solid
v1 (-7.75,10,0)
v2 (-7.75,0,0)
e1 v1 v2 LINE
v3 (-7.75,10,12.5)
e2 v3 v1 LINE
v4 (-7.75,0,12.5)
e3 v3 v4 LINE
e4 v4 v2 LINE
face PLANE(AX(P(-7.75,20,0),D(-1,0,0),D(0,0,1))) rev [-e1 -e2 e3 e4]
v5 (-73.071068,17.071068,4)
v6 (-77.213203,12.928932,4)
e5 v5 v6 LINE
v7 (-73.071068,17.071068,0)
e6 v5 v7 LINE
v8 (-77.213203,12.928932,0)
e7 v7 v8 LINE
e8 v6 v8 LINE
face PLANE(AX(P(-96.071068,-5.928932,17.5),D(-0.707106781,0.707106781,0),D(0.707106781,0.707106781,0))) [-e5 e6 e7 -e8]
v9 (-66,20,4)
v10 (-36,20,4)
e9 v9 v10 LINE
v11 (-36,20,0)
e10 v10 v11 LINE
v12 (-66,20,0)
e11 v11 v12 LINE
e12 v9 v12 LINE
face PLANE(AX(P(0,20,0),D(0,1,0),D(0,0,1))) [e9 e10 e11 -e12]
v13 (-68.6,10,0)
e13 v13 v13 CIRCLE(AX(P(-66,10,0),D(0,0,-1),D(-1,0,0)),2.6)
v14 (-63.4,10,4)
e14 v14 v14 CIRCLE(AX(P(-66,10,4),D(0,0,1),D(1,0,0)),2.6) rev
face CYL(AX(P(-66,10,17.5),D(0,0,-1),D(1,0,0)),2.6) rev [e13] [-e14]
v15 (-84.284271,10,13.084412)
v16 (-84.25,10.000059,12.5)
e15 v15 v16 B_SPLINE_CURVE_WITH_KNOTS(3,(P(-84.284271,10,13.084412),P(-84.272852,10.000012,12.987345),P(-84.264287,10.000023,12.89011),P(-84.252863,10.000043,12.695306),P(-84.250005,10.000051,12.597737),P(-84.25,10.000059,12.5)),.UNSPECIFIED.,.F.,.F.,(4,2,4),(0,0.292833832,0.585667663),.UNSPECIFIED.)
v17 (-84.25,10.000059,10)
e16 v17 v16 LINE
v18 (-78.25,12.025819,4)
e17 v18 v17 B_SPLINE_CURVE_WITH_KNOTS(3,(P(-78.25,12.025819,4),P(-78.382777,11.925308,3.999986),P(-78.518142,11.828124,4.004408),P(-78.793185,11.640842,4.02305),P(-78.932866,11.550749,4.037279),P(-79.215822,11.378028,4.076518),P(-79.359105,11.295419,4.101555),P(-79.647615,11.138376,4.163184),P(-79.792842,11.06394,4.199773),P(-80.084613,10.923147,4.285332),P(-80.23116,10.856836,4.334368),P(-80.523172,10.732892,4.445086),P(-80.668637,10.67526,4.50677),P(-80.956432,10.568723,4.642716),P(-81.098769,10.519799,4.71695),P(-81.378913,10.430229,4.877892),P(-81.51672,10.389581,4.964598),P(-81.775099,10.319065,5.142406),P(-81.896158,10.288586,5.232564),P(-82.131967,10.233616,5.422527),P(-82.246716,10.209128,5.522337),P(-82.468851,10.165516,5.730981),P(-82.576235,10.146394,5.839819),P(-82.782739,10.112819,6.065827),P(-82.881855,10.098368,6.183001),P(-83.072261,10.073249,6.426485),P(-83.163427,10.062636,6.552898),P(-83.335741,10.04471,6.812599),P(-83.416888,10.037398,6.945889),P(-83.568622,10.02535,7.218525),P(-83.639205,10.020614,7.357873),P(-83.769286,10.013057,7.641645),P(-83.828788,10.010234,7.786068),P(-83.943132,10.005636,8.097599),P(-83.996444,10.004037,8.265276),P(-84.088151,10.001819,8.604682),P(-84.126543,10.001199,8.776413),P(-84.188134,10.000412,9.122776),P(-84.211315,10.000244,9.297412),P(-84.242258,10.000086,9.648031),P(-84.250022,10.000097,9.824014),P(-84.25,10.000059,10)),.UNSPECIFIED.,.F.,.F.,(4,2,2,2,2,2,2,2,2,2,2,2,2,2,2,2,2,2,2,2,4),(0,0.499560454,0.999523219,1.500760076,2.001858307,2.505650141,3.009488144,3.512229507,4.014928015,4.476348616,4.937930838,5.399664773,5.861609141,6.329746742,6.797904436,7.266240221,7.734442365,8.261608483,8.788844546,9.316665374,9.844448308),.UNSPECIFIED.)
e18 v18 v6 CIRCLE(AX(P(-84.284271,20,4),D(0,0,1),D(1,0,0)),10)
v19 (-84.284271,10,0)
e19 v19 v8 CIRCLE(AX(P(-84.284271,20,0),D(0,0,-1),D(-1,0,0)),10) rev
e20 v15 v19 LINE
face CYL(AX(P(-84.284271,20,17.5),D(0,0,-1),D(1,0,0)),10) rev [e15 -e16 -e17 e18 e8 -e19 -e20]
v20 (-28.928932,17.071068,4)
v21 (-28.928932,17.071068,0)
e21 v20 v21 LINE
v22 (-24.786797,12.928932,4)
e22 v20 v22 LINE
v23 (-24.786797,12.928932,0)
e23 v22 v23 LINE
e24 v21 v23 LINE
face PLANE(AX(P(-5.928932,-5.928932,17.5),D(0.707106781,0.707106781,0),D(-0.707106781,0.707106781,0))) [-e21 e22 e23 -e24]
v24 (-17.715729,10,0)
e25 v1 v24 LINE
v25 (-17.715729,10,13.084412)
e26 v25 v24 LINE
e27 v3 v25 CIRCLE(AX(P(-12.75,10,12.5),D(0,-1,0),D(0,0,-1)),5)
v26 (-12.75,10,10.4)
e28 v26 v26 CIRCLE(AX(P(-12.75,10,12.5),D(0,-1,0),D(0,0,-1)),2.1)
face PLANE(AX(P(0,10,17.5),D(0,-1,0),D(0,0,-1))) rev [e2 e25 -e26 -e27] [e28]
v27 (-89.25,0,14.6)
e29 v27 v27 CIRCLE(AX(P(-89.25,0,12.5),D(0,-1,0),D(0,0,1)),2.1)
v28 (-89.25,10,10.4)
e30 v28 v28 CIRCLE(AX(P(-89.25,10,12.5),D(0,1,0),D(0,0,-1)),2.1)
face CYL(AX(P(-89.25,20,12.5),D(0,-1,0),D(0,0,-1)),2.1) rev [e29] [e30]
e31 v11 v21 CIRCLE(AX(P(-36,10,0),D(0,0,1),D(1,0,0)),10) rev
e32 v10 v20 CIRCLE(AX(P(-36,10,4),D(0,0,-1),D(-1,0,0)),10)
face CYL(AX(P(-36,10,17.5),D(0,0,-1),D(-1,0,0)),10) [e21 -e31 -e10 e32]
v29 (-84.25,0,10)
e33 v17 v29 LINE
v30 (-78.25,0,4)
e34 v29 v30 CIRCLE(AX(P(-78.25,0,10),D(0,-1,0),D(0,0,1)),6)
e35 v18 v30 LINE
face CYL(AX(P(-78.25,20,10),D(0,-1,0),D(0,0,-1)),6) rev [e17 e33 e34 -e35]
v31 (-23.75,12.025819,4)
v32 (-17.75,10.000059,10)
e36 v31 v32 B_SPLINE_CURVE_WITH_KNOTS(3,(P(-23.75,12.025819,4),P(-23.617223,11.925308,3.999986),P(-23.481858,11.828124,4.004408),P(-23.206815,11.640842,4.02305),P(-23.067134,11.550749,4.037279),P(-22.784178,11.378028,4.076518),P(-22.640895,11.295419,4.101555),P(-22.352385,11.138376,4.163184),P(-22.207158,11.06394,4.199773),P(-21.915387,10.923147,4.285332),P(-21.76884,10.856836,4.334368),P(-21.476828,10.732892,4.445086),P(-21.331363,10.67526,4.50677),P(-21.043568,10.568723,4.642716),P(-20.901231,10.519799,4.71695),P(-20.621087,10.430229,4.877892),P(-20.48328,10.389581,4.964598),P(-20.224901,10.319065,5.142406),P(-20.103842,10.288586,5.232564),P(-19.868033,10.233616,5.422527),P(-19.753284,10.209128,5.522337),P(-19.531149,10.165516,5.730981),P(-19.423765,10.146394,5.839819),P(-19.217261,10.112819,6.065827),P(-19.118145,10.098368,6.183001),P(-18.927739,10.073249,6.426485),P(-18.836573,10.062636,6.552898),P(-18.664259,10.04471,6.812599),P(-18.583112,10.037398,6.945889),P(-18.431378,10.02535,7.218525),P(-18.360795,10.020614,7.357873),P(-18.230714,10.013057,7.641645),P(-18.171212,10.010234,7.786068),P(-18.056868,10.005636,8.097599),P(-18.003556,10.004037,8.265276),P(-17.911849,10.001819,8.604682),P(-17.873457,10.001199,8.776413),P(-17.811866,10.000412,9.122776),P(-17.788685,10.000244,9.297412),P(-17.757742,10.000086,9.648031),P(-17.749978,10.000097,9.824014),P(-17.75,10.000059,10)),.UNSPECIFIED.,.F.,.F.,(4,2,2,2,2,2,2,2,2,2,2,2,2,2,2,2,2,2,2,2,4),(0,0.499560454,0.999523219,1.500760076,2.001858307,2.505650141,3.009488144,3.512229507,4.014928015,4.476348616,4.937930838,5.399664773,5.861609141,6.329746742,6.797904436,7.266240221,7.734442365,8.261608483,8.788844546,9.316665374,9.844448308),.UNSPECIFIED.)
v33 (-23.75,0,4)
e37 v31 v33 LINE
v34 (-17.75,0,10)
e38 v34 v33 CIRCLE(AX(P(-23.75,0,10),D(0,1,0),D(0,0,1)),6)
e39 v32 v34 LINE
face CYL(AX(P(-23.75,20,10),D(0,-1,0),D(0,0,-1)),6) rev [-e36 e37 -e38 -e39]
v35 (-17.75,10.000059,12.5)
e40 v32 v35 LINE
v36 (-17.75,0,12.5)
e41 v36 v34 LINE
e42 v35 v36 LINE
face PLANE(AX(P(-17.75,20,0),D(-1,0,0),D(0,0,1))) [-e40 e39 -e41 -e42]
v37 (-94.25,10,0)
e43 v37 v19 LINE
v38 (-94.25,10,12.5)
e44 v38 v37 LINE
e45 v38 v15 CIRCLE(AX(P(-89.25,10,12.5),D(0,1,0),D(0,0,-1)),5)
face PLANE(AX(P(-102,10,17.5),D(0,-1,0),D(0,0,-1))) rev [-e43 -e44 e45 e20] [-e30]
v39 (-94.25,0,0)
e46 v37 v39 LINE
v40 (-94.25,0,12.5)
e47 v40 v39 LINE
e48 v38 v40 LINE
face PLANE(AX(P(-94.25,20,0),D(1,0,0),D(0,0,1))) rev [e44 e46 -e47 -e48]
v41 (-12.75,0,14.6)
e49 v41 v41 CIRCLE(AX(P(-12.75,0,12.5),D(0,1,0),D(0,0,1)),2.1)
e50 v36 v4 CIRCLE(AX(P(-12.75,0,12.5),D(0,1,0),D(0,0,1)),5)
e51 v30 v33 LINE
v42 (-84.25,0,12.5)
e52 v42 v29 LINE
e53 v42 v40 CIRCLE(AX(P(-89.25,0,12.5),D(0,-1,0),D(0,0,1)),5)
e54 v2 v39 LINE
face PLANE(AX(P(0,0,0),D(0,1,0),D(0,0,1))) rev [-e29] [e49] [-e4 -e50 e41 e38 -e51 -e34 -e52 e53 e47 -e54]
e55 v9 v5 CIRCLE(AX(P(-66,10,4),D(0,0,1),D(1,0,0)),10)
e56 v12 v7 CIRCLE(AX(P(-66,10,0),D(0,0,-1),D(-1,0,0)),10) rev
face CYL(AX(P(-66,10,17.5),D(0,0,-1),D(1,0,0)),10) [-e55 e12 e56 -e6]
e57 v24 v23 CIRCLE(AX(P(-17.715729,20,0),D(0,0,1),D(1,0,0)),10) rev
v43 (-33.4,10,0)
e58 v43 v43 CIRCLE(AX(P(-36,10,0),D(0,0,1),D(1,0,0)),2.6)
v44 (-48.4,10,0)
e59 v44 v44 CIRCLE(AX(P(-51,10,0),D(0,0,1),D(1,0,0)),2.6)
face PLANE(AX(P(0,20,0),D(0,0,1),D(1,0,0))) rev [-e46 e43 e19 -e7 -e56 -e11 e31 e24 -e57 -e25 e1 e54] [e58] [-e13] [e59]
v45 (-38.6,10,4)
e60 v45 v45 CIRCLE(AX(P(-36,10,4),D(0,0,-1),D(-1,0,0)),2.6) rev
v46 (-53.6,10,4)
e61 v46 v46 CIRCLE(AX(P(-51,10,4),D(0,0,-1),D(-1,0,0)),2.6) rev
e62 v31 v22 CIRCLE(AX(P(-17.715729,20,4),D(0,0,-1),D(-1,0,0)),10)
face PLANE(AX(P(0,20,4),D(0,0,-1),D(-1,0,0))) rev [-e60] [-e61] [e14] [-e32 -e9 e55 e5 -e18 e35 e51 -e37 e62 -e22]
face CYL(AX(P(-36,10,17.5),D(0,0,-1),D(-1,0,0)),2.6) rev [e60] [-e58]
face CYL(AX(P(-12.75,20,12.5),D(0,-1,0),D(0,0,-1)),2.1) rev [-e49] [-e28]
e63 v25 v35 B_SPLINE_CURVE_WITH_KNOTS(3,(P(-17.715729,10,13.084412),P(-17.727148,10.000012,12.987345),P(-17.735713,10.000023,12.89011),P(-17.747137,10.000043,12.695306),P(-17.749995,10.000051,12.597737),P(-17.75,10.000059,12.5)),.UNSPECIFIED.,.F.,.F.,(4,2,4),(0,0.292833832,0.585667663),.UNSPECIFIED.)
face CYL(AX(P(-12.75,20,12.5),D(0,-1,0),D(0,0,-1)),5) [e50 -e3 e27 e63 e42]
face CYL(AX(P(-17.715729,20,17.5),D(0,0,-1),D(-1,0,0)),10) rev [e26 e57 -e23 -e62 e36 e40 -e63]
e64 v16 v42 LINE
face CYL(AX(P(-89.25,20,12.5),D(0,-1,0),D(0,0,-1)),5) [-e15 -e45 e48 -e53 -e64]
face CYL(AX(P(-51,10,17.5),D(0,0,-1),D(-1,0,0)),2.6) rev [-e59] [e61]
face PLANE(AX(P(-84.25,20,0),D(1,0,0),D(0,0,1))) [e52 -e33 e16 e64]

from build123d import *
from build123d.topology import SkipClean

# Parameters (mm, degrees)
SKETCH1_R           = 2.1
BOSS_EXTRUDE1_DEPTH = 20
SKETCH3_R           = 2.6
BOSS_EXTRUDE2_DEPTH = 17.5


with BuildPart() as part:
    # Sketch1 → Boss-Extrude1 (new body)
    with BuildSketch(Plane(origin=(0, 0, 0), x_dir=(1, 0, 0), z_dir=(0, 1, 0))):
        with BuildLine():
            Line((-7.75, -12.5), (-7.75, 0))
            Line((-7.75, 0), (-51, 0))
            Line((-51, 0), (-51, -4))
            Line((-51, -4), (-23.75, -4))
            ThreePointArc((-23.75, -4), (-19.507359313, -5.757359313), (-17.75, -10))
            Line((-17.75, -10), (-17.75, -12.5))
            ThreePointArc((-17.75, -12.5), (-12.75, -17.5), (-7.75, -12.5))
        make_face()
        with Locations(Location((-12.75, -12.5, 0), (0, 0, 270))):
            Circle(SKETCH1_R, mode=Mode.SUBTRACT)
    extrude(amount=BOSS_EXTRUDE1_DEPTH)


with BuildPart() as body_2:
    # Sketch3 → Boss-Extrude2 (new, through all)
    with BuildSketch(Plane.XY):
        with BuildLine():
            Line((-51, 0), (-7.75, 0))
            Line((-7.75, 0), (-7.75, 10))
            Line((-7.75, 10), (-17.715728753, 10))
            ThreePointArc((-17.715728753, 10), (-21.542563076, 10.761204675), (-24.786796564, 12.928932188))
            Line((-24.786796564, 12.928932188), (-28.928932188, 17.071067812))
            ThreePointArc((-28.928932188, 17.071067812), (-32.173165676, 19.238795325), (-36, 20))
            Line((-36, 20), (-51, 20))
            Line((-51, 20), (-51, 12.6))
            ThreePointArc((-51, 12.6), (-49.161522369, 11.838477631), (-48.4, 10))
            ThreePointArc((-48.4, 10), (-49.161522369, 8.161522369), (-51, 7.4))
            Line((-51, 7.4), (-51, 0))
        make_face()
        with Locations((-36, 10)):
            Circle(SKETCH3_R, mode=Mode.SUBTRACT)
    extrude(amount=BOSS_EXTRUDE2_DEPTH)

    # Intersect1: read off the stored shape, not the designer's step
    # Intersect1: intersect part
    add(part.part, mode=Mode.INTERSECT)

    # Mirror1: body 2 across face


with BuildPart() as body_2_1:
    with SkipClean():  # the faces are left unmerged after this step: merging them gives an invalid solid
        add(body_2.part)
        add(body_2.part.mirror(Plane(origin=(-51, 16.3, 2), x_dir=(0, 0, 1), z_dir=(-1, 0, 0))))


solid = body_2_1.part
